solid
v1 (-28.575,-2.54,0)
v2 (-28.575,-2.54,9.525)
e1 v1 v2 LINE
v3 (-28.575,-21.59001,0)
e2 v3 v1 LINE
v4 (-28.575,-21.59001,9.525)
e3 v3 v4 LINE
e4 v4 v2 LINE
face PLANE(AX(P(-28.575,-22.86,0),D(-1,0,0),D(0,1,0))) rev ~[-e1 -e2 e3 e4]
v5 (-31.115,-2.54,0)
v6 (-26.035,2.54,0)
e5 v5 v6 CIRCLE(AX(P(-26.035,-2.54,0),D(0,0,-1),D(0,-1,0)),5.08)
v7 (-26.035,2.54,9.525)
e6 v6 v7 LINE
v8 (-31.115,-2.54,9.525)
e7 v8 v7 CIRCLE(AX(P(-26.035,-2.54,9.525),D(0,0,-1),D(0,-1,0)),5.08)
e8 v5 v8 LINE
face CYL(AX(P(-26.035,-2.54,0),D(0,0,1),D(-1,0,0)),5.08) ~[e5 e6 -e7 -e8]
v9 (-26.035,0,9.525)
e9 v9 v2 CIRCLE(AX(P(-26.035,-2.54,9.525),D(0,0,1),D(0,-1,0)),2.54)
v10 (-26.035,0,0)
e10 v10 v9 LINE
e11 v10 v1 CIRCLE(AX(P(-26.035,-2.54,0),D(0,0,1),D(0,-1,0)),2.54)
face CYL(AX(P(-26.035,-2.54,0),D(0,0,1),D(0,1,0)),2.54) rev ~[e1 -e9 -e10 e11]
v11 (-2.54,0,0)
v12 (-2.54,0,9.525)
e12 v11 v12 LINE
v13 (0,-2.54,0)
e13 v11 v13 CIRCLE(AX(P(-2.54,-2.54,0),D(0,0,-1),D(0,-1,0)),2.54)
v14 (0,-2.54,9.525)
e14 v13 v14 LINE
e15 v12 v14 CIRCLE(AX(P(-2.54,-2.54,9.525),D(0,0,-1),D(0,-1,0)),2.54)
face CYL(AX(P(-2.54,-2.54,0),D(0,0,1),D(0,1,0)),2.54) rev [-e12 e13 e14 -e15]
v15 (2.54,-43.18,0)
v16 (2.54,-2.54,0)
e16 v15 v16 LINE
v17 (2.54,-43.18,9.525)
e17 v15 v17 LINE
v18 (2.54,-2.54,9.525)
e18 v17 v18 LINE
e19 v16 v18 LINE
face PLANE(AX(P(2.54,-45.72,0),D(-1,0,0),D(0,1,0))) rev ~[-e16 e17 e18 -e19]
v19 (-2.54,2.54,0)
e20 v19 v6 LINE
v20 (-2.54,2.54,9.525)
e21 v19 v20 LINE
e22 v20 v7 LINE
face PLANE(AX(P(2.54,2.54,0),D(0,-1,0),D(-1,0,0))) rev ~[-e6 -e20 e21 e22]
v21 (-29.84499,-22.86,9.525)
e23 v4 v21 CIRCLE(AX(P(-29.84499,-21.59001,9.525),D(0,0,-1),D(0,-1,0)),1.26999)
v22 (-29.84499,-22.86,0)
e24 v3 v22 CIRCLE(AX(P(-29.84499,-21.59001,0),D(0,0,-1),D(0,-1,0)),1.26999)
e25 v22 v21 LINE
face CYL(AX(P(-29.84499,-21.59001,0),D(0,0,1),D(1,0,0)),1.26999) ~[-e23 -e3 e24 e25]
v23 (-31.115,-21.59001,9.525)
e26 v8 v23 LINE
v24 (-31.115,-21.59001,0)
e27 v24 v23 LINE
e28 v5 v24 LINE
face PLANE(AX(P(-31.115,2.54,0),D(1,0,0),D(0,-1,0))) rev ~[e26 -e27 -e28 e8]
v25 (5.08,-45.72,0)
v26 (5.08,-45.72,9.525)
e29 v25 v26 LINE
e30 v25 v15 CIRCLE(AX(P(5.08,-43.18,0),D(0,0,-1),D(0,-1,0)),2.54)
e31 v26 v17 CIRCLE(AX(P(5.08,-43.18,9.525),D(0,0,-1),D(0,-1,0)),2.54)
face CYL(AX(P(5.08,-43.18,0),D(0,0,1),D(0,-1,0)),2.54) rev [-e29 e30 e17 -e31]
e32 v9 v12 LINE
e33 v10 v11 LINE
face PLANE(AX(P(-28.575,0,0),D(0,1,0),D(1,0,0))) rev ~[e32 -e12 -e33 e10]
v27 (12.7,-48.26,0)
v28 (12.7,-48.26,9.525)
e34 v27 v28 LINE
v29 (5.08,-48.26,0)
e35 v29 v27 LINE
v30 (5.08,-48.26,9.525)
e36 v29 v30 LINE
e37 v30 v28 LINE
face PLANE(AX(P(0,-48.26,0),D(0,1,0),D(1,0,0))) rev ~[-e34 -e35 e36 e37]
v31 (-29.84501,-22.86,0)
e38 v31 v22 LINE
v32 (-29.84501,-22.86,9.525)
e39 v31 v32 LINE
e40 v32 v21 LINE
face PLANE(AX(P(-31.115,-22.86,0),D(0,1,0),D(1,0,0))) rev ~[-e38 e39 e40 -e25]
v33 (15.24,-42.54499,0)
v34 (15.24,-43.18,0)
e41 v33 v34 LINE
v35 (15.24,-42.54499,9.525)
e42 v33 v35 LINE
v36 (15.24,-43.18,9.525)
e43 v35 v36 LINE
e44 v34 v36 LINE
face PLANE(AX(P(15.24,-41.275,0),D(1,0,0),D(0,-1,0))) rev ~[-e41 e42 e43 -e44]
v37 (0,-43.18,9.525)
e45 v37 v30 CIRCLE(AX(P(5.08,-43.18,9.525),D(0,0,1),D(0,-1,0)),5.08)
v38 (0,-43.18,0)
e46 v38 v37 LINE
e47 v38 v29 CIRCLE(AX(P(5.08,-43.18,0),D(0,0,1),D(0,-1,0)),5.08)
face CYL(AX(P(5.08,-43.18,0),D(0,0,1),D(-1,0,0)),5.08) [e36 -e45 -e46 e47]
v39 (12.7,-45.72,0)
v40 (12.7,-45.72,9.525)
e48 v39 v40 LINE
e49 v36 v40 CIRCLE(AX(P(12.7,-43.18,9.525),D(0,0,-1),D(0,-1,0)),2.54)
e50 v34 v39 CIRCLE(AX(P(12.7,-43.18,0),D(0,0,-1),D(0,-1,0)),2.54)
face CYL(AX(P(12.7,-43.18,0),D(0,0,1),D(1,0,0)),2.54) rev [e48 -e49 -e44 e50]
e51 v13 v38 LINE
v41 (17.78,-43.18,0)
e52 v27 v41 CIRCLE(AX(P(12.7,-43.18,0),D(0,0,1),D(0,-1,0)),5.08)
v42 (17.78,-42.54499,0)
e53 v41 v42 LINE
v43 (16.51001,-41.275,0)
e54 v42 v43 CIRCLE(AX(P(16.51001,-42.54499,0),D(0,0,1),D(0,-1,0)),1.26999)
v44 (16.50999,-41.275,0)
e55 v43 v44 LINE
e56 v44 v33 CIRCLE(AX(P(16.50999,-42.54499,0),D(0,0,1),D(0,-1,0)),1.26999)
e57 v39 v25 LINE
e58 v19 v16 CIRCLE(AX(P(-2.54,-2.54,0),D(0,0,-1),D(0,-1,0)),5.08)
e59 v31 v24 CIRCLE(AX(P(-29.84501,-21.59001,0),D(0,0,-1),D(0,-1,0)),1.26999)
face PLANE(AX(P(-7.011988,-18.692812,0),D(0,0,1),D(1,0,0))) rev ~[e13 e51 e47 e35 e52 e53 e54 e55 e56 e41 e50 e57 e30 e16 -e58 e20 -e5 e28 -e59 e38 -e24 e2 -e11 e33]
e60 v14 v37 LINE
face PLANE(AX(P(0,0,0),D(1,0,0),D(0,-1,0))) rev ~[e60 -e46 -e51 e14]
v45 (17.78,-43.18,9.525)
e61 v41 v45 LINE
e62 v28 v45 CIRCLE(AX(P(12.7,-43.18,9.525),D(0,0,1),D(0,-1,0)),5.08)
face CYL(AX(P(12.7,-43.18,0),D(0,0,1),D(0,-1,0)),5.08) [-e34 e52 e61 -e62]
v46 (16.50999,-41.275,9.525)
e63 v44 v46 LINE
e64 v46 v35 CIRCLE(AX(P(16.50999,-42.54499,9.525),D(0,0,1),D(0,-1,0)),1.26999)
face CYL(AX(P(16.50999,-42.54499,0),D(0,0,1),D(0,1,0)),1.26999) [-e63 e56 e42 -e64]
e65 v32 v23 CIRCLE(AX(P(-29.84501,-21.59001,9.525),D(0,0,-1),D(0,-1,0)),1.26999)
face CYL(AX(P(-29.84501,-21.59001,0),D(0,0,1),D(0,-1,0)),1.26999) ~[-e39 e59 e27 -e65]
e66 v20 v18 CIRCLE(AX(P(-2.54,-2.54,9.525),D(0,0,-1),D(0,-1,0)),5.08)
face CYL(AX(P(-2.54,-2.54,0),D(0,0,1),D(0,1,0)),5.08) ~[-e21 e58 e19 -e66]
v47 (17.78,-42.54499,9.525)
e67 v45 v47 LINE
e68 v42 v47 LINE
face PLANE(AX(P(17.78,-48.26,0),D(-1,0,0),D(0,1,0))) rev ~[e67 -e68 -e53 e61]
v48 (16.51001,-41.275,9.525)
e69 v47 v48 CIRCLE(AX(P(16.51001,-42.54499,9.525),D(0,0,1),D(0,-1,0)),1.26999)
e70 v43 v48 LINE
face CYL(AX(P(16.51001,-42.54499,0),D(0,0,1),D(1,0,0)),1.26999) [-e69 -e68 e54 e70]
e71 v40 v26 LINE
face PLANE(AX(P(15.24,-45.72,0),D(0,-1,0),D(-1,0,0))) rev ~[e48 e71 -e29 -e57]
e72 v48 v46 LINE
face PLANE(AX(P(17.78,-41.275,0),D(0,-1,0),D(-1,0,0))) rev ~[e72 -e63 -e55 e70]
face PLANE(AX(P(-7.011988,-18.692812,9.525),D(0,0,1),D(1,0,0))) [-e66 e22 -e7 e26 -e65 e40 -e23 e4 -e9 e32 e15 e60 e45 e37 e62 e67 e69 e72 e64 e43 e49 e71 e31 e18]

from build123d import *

# Parameters (mm, degrees)
F1_DEPTH = 9.525
F2_R     = 2.54
F3_R     = 5.08
F4_R     = 1.26999


# Not quite as in the source:
# - a fillet or chamfer is up to 0.001 mm smaller than in the source, because OpenCascade refuses the exact size


with BuildPart() as f1:
    # F0 (on Top) → F1 (new body)
    with BuildSketch(Plane.XY):
        Polygon((-28.575, 0), (0, 0), (0, -48.26), (17.78, -48.26), (17.78, -41.275), (15.24, -41.275), (15.24, -45.72), (2.54, -45.72), (2.54, 2.54), (-31.115, 2.54), (-31.115, -22.86), (-28.575, -22.86), align=None)
    extrude(amount=F1_DEPTH)

    # F2
    f2_edges = [f1.edges().sort_by_distance(p)[0] for p in [
        (15.24, -45.72, 4.7625),
        (2.54, -45.72, 4.7625),
        (-28.575, 0, 4.7625),
        (0, 0, 4.7625),
    ]]
    fillet(f2_edges, radius=F2_R)

    # F3
    f3_edges = [f1.edges().sort_by_distance(p)[0] for p in [
        (17.78, -48.26, 4.7625),
        (0, -48.26, 4.7625),
        (2.54, 2.54, 4.7625),
        (-31.115, 2.54, 4.7625),
    ]]
    fillet(f3_edges, radius=F3_R)

    # F4 (radius 1.27 in the source; OpenCascade refuses exactly that, so slightly less here)
    f4_edges = [f1.edges().sort_by_distance(p)[0] for p in [
        (-31.115, -22.86, 4.7625),
        (-28.575, -22.86, 4.7625),
        (15.24, -41.275, 4.7625),
        (17.78, -41.275, 4.7625),
    ]]
    fillet(f4_edges, radius=F4_R)


solid = f1.part
